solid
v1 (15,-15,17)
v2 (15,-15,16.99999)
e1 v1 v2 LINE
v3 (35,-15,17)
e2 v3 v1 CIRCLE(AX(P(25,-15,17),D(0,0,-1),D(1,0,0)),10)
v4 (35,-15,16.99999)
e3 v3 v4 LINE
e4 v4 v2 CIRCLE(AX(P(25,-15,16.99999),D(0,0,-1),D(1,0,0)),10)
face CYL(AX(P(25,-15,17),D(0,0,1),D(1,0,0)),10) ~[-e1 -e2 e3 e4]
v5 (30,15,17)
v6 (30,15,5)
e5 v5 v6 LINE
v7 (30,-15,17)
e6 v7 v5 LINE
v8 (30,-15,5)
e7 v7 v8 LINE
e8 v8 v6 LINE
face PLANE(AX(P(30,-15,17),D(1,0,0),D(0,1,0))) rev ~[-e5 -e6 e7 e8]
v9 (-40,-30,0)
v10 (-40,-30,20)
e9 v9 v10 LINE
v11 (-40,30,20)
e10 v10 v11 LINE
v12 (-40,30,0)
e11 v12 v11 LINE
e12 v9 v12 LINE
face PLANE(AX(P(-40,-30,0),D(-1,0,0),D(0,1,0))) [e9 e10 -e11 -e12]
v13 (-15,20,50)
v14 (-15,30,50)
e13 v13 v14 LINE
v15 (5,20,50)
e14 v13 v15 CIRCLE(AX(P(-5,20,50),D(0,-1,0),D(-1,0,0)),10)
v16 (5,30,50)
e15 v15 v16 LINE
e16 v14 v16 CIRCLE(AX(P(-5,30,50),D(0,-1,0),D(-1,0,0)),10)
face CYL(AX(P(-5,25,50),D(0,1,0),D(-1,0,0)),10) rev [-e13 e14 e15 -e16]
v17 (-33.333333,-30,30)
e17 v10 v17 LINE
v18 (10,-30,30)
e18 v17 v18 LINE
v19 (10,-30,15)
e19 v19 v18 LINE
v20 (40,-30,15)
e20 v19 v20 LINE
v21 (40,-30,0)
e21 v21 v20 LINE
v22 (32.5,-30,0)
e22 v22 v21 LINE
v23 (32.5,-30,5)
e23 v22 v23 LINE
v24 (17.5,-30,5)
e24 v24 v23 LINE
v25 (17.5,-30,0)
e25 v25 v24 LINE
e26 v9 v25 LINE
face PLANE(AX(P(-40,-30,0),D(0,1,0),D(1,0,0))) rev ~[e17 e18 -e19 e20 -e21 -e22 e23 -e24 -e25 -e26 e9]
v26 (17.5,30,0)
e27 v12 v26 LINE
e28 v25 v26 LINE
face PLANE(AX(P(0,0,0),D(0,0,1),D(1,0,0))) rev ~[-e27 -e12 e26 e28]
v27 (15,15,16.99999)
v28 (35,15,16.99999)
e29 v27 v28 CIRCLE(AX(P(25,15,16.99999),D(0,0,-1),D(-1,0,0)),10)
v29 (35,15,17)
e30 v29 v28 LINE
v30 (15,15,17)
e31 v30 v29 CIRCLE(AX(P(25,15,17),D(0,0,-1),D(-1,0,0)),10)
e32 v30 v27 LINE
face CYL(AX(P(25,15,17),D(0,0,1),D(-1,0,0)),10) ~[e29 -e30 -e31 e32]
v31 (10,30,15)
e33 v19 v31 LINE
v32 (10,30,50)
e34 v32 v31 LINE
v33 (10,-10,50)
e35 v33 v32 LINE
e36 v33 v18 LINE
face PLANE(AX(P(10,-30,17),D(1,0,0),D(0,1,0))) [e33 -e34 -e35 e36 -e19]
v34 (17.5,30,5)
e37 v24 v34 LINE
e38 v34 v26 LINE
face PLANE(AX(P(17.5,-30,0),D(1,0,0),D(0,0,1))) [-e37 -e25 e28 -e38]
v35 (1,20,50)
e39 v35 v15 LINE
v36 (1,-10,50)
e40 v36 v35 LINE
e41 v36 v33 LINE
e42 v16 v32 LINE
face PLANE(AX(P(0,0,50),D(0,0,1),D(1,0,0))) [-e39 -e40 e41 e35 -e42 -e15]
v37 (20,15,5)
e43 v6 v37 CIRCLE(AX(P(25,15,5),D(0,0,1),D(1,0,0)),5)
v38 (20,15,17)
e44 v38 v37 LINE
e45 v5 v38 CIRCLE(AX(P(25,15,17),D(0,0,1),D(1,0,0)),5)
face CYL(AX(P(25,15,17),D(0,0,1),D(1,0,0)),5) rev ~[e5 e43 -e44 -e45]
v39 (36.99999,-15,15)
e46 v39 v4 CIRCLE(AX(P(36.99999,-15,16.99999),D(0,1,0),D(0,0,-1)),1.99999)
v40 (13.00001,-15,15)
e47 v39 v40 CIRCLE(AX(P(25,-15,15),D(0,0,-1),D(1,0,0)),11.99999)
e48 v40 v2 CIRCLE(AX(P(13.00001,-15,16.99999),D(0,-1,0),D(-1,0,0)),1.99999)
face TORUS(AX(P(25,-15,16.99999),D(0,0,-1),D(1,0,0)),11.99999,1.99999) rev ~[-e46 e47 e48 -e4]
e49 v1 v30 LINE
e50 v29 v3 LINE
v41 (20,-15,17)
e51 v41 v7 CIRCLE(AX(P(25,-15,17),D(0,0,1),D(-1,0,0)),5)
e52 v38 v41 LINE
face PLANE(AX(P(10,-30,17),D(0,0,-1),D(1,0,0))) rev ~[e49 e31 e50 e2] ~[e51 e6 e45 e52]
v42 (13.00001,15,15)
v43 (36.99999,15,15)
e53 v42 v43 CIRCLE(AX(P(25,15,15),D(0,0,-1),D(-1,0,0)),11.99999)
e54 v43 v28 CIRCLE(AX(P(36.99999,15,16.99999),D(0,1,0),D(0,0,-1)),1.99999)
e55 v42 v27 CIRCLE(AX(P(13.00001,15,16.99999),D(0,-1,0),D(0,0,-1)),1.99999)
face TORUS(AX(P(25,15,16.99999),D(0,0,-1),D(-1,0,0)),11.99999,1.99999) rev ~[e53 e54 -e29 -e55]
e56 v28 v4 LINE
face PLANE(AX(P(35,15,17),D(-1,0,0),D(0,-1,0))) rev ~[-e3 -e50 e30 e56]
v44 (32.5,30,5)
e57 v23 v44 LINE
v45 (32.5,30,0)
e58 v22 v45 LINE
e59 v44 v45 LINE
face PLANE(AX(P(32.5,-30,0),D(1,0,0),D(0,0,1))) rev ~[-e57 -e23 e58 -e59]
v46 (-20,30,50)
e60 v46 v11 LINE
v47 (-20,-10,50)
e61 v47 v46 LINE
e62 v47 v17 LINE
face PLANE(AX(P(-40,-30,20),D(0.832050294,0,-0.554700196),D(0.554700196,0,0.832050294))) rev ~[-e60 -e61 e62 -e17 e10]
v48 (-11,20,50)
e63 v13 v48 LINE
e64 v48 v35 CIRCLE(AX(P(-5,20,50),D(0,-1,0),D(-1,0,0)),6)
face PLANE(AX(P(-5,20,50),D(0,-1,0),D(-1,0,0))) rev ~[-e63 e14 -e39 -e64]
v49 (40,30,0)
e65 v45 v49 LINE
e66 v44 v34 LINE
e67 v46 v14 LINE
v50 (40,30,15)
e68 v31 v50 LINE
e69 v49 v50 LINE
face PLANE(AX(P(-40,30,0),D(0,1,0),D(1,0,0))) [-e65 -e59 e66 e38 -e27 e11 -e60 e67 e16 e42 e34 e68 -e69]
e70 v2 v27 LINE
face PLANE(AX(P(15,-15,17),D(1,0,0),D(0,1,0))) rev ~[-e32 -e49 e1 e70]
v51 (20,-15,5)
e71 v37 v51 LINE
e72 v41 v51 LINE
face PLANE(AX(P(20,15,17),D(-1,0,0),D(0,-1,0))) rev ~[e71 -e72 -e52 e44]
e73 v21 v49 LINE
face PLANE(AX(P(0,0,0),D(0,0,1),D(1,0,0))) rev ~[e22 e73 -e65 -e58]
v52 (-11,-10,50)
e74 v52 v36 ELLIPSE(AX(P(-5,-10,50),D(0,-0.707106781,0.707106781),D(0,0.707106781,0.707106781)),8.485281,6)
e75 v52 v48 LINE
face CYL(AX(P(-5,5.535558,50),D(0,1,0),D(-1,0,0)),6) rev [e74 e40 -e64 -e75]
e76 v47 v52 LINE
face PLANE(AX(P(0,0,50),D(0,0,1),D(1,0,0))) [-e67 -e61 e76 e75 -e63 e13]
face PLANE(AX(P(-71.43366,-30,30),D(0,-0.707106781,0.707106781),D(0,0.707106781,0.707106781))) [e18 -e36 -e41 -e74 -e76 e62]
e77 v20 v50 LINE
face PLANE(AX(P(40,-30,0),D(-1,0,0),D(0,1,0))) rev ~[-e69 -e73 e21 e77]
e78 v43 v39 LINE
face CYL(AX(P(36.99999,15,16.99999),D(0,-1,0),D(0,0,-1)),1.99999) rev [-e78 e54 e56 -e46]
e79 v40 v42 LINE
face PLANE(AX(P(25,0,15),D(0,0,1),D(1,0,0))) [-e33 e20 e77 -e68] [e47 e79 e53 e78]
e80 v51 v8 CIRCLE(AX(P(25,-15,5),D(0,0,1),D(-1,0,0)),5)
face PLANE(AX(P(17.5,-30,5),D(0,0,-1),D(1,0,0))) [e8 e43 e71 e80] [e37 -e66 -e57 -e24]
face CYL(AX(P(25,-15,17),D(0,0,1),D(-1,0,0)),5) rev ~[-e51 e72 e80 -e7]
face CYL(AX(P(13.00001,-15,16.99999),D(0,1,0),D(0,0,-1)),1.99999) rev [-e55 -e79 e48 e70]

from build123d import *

# Parameters (mm, degrees)
F0_W         = 80
F0_H         = 60
F1_DEPTH     = 50
F2_W         = 30
F2_H         = 33
F3_DEPTH     = 60.001
F5_DEPTH     = 17.001
F6_W         = 30
F6_H         = 60
F7_DEPTH     = 2
F8_W         = 15
F8_H         = 5
F9_DEPTH     = 60.001
F10_R        = 1.99999
F12_DEPTH    = 60.001
F13_W        = 6
F13_H        = 48.9288835973
F15_W        = 4
F15_H        = 10
F17_T1_DEPTH = 132.8673195186


# Not quite as in the source:
# - a fillet or chamfer that OpenCascade refuses, or shapes differently, is made with other operations: its cross-section is extruded or revolved along the edge and cut away or added
# - a fillet or chamfer is up to 0.001 mm smaller than in the source, because OpenCascade refuses the exact size


with BuildPart() as f1:
    # F0 (on Top) → F1 (new body)
    with BuildSketch(Plane.XY):
        Rectangle(F0_W, F0_H)
    extrude(amount=F1_DEPTH)

    # F2 (on face) → F3 (cut, through all)
    with BuildSketch(Plane.XZ.offset(30)):
        with Locations((25, 33.5)):
            Rectangle(F2_W, F2_H)
    extrude(amount=-F3_DEPTH, mode=Mode.SUBTRACT)

    # F4 (on face) → F5 (cut, through all)
    with BuildSketch(Plane.XY.offset(17)):
        with BuildLine():
            ThreePointArc((20, -15), (25, -20), (30, -15))
            Line((30, -15), (30, 15))
            ThreePointArc((30, 15), (25, 20), (20, 15))
            Line((20, 15), (20, -15))
        make_face()
    extrude(amount=-F5_DEPTH, mode=Mode.SUBTRACT)

    # F6 (on face) → F7 (cut)
    with BuildSketch(Plane.XY.offset(17)):
        with Locations((25, 0)):
            Rectangle(F6_W, F6_H)
        with BuildLine():
            Line((35, 15), (35, -15))
            ThreePointArc((35, -15), (25, -25), (15, -15))
            Line((15, -15), (15, 15))
            ThreePointArc((15, 15), (25, 25), (35, 15))
        make_face(mode=Mode.SUBTRACT)
    extrude(amount=-F7_DEPTH, mode=Mode.SUBTRACT)

    # F8 (on face) → F9 (cut, through all)
    with BuildSketch(Plane.XZ.offset(30)):
        with Locations((25, 2.5)):
            Rectangle(F8_W, F8_H)
    extrude(amount=-F9_DEPTH, mode=Mode.SUBTRACT)

    # F10 (radius 2 in the source; OpenCascade refuses exactly that, so slightly less here)
    f10_edges = [f1.edges().sort_by_distance(p)[0] for p in [
        (35, 0, 15),
    ]]
    fillet(f10_edges, radius=F10_R)

    # F11 (on face) → F12 (cut, through all)
    with BuildSketch(Plane.XZ.offset(30)):
        Polygon((-40, 20), (-20, 50), (-40, 50), align=None)
    extrude(amount=-F12_DEPTH, mode=Mode.SUBTRACT)

    # F13 (on face) → F14 (revolve, cut)
    with BuildSketch(Plane.XY.offset(50)):
        with Locations((-8, 5.5355582014)):
            Rectangle(F13_W, F13_H)
    revolve(axis=Axis((-5, -1.603256911, 50), (0, -1, 0)), mode=Mode.SUBTRACT)

    # F15 (on face) → F16 (revolve, cut)
    with BuildSketch(Plane.XY.offset(50)):
        with Locations((-13, 25)):
            Rectangle(F15_W, F15_H)
    revolve(axis=Axis((-5, 25, 50), (0, -1, 0)), mode=Mode.SUBTRACT)

    # F17: chamfer of 20 on 1 edges, made by hand

    # F17_s2 → F17_t1 (cut)
    with BuildSketch(Plane.YZ.offset(-71.4336597593)):
        Polygon((-30, 30), (-10, 50), (-30, 50), align=None)
    extrude(amount=F17_T1_DEPTH, mode=Mode.SUBTRACT)


solid = f1.part
